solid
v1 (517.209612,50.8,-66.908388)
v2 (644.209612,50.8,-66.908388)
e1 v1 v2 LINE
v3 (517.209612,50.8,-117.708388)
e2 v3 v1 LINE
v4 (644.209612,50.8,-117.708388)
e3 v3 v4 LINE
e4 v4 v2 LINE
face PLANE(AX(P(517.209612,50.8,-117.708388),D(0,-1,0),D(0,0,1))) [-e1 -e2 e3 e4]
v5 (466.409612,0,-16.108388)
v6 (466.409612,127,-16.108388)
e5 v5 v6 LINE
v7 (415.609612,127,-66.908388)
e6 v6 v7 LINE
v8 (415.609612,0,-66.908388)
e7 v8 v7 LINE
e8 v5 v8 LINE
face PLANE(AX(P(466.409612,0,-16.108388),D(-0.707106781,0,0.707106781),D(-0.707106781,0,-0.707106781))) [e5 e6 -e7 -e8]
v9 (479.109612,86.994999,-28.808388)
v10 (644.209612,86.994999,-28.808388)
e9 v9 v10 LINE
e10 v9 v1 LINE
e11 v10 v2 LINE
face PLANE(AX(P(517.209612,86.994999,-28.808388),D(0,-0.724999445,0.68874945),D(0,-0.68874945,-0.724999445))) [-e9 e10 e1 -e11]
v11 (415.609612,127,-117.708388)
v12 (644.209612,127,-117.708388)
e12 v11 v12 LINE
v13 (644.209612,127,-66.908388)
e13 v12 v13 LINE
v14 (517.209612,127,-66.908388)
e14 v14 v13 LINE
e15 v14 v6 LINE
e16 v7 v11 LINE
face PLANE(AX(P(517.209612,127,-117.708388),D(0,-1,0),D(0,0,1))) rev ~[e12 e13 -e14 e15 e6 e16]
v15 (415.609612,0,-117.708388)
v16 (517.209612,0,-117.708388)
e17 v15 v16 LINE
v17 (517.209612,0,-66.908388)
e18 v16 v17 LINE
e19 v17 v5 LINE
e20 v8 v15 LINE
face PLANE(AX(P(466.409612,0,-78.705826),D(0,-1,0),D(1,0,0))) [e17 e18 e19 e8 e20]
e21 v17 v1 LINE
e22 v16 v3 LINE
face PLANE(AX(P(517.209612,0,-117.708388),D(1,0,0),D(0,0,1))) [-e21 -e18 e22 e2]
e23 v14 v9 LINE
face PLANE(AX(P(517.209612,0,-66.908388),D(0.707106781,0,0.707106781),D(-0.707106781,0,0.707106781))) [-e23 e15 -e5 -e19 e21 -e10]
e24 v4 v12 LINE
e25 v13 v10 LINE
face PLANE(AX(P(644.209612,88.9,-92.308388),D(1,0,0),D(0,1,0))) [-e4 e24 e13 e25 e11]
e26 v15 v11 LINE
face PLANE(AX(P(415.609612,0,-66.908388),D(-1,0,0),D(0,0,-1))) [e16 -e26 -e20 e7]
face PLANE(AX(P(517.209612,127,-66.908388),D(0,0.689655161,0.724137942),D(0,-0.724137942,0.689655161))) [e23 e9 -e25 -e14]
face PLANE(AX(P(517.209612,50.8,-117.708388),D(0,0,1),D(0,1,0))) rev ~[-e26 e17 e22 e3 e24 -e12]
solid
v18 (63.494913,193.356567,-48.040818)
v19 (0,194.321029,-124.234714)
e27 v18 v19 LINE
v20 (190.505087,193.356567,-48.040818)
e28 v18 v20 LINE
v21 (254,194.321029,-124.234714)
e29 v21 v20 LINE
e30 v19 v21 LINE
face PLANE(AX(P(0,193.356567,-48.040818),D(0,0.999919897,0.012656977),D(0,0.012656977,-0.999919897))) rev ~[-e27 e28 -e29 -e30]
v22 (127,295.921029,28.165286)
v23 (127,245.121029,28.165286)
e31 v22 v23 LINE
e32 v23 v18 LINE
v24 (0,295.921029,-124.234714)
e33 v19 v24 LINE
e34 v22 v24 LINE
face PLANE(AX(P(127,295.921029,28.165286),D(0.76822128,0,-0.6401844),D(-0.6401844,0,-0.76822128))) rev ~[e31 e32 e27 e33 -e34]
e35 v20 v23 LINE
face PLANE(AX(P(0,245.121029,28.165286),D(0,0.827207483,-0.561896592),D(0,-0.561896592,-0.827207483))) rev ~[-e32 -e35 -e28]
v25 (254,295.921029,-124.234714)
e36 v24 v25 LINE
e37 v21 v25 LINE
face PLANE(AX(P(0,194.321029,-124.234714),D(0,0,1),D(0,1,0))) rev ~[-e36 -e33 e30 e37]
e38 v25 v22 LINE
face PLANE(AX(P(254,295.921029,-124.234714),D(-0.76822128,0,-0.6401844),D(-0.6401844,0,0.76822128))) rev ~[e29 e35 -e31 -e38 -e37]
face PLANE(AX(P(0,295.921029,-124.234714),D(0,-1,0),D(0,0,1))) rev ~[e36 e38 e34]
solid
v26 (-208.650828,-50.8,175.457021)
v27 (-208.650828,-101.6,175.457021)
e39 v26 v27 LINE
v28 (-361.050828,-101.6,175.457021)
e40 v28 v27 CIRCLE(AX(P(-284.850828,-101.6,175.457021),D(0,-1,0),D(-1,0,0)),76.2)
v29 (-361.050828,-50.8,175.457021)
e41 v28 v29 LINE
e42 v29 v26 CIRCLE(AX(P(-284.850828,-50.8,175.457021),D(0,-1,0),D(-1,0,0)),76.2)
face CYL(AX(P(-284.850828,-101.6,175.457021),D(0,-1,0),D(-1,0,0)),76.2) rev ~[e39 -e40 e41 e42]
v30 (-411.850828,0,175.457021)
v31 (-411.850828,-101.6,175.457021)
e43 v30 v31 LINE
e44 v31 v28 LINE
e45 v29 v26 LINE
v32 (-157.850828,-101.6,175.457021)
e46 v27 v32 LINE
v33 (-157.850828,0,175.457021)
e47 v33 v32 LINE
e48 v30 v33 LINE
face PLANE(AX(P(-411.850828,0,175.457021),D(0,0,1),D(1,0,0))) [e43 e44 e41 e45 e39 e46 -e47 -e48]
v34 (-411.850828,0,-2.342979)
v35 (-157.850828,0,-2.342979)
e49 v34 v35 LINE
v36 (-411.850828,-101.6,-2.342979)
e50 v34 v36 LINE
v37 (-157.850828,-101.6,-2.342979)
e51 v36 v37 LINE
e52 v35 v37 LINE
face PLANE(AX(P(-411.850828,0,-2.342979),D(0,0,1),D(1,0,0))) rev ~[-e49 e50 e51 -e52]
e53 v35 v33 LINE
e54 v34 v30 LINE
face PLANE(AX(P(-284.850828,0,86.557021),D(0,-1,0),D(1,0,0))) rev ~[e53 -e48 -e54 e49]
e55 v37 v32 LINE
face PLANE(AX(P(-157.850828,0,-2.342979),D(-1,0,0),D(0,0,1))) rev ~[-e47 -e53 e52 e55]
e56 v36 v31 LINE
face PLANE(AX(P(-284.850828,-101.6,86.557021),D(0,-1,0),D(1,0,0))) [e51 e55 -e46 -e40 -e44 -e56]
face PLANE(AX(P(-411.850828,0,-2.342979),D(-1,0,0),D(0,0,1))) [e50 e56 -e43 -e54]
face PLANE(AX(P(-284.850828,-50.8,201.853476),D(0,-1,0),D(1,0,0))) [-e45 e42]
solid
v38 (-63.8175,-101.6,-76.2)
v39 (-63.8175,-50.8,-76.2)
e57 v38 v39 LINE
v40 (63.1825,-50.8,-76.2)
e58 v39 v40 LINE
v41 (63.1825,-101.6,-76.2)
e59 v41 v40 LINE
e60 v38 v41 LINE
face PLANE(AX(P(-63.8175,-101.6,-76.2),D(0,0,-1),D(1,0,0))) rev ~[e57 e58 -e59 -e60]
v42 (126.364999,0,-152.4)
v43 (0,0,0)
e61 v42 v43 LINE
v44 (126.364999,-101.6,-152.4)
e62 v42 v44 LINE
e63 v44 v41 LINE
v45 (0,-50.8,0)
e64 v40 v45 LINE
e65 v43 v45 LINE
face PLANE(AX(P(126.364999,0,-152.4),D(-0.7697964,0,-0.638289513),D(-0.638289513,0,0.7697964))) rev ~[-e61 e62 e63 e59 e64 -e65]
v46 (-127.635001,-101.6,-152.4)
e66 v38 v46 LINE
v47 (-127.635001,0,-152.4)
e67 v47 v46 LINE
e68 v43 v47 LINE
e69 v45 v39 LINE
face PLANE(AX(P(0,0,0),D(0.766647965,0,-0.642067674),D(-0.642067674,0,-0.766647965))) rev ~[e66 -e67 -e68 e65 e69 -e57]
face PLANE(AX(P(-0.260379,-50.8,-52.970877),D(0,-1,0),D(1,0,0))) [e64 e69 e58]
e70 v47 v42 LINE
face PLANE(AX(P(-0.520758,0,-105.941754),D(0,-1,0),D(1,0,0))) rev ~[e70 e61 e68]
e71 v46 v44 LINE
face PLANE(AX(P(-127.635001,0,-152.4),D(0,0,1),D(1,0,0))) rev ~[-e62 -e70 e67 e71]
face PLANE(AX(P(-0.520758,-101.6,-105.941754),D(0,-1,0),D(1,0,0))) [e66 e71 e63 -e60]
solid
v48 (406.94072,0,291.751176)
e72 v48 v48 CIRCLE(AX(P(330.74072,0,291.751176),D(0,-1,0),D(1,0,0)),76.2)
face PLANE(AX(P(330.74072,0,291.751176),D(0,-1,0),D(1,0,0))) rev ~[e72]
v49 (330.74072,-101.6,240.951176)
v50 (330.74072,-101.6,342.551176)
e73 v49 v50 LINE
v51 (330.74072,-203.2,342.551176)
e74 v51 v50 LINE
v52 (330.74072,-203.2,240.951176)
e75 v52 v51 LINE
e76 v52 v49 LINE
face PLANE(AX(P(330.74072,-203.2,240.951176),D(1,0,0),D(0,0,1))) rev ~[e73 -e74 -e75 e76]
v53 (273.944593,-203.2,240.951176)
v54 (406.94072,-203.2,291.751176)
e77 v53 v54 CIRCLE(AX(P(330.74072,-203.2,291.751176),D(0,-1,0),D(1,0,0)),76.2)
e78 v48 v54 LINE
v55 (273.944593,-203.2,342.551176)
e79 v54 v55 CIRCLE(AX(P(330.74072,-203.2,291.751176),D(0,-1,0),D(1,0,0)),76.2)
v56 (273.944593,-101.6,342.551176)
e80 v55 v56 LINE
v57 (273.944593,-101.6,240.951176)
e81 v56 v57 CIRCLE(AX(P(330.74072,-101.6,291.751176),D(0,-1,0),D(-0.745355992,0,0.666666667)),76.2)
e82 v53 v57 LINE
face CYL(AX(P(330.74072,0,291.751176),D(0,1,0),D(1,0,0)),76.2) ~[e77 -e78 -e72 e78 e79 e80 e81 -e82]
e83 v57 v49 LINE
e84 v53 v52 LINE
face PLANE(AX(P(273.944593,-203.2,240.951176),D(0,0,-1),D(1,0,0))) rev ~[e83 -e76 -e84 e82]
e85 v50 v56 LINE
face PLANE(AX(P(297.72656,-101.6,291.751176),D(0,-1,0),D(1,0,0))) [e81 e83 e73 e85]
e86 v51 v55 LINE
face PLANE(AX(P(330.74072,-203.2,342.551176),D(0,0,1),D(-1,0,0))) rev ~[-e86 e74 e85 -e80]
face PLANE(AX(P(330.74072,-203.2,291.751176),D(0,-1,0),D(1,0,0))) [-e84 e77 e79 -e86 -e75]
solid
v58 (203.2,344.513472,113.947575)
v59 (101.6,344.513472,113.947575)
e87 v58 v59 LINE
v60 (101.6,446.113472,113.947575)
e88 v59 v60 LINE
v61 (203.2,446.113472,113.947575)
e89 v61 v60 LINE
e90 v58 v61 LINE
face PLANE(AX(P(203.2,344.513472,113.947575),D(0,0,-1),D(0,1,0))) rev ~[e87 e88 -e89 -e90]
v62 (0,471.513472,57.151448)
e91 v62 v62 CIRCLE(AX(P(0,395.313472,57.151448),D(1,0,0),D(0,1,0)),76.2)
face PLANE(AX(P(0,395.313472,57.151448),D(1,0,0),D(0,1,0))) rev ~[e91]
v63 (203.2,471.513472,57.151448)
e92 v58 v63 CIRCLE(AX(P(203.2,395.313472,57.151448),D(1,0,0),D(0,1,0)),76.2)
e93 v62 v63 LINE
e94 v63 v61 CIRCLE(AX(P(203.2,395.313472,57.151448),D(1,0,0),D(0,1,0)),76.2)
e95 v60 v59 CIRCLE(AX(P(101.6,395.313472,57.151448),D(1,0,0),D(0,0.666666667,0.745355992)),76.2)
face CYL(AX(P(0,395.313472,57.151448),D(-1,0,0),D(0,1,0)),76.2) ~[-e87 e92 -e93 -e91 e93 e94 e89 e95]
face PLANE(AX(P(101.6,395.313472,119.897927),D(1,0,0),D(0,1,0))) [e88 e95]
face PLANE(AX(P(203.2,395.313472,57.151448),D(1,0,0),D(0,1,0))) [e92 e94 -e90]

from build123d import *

# Parameters (mm, degrees)
F1_DEPTH  = 101.6
F3_DEPTH  = 50.8
F5_DEPTH  = 254
F7_DEPTH  = 254
F9_DEPTH  = 254
F11_DEPTH = 127
F12_W     = 76.2
F12_H     = 50.8
F13_DEPTH = 127
F15_R     = 76.2
F16_DEPTH = 203.2
F18_DEPTH = 101.6
F19_R     = 76.2
F20_DEPTH = 203.2
F22_DEPTH = 101.6
F23_W     = 254
F23_H     = 177.8
F24_DEPTH = 101.6
F26_DEPTH = 50.8


with BuildPart() as f1:
    # F0 (on Front) → F1 (new body)
    with BuildSketch(Plane.XZ):
        Polygon((0, 0), (-127.6350005588, -152.4), (126.3649994412, -152.4), align=None)
    extrude(amount=F1_DEPTH)

    # F2 (on face) → F3 (cut)
    with BuildSketch(Plane.XZ.offset(101.6)):
        Polygon((0, 0), (-63.8175002794, -76.2), (63.1824997206, -76.2), align=None)
    extrude(amount=-F3_DEPTH, mode=Mode.SUBTRACT)


with BuildPart() as f5:
    # F4 (on Right) → F5 (new body)
    with BuildSketch(Plane.YZ):
        Polygon((193.3565672969, -48.0408182748), (194.32102892, -124.2347144462), (295.92102892, -124.2347144462), (295.92102892, 28.1652855538), (245.12102892, 28.1652855538), align=None)
    extrude(amount=F5_DEPTH)

    # F6 (on face) → F7 (cut)
    with BuildSketch(Plane(origin=(0, 295.92102892, 0), x_dir=(-1, 0, 0), z_dir=(0, 1, 0))):
        Polygon((-254, 28.1652855538), (-254, -124.2347144462), (-127, 28.1652855538), align=None)
    extrude(amount=-F7_DEPTH, mode=Mode.SUBTRACT)

    # F8 (on face) → F9 (cut)
    with BuildSketch(Plane(origin=(0, 295.92102892, 0), x_dir=(-1, 0, 0), z_dir=(0, 1, 0))):
        Polygon((-127, 28.1652855538), (0, -124.2347144462), (0, 28.1652855538), align=None)
    extrude(amount=-F9_DEPTH, mode=Mode.SUBTRACT)


with BuildPart() as f11:
    # F10 (on Front) → F11 (new body)
    with BuildSketch(Plane.XZ):
        Polygon((415.6096123431, -66.908387676), (415.6096123431, -117.708387676), (517.2096123431, -117.708387676), (517.2096123431, -66.908387676), (466.4096123431, -16.108387676), align=None)
    extrude(amount=-F11_DEPTH)

    # F12 (on face) → F13 (join)
    with BuildSketch(Plane.YZ.offset(517.2096123431)):
        with Locations((88.9, -92.308387676)):
            Rectangle(F12_W, F12_H)
        Polygon((50.8, -66.908387676), (127, -66.908387676), (86.994998771, -28.808387676), align=None)
    extrude(amount=F13_DEPTH)

    # F12 (on face) → F14 (join, up to the next surface of F11)
    with BuildSketch(Plane.YZ.offset(517.2096123431)):
        Polygon((50.8, -66.908387676), (127, -66.908387676), (86.994998771, -28.808387676), align=None)
    extrude(until=Until.NEXT, dir=(-1, 0, 0))


with BuildPart() as f16:
    # F15 (on Right) → F16 (new body)
    with BuildSketch(Plane.YZ):
        with Locations((395.3134715557, 57.1514479816)):
            Circle(F15_R)
    extrude(amount=F16_DEPTH)

    # F17 (on face) → F18 (cut)
    with BuildSketch(Plane.YZ.offset(203.2)):
        with BuildLine():
            ThreePointArc((446.1134715557, 113.9475746101), (395.3134715557, 133.3514479816), (344.5134715557, 113.9475746101))
            Line((344.5134715557, 113.9475746101), (446.1134715557, 113.9475746101))
        make_face()
    extrude(amount=-F18_DEPTH, mode=Mode.SUBTRACT)


with BuildPart() as f20:
    # F19 (on Front) → F20 (new body)
    with BuildSketch(Plane.XZ):
        with Locations((330.7407200336, 291.7511761189)):
            Circle(F19_R)
    extrude(amount=F20_DEPTH)

    # F21 (on face) → F22 (cut)
    with BuildSketch(Plane.XZ.offset(203.2)):
        with BuildLine():
            Line((330.7407200336, 342.5511761189), (273.9445934052, 342.5511761189))
            ThreePointArc((273.9445934052, 342.5511761189), (254.5407200336, 291.7511761189), (273.9445934052, 240.9511761189))
            Line((273.9445934052, 240.9511761189), (330.7407200336, 240.9511761189))
            Line((330.7407200336, 240.9511761189), (330.7407200336, 342.5511761189))
        make_face()
    extrude(amount=-F22_DEPTH, mode=Mode.SUBTRACT)


with BuildPart() as f24:
    # F23 (on Front) → F24 (new body)
    with BuildSketch(Plane.XZ):
        with Locations((-284.8508283496, 86.5570213336)):
            Rectangle(F23_W, F23_H)
    extrude(amount=F24_DEPTH)

    # F25 (on face) → F26 (cut)
    with BuildSketch(Plane.XZ.offset(101.6)):
        with BuildLine():
            Line((-361.0508283496, 175.4570213336), (-208.6508283496, 175.4570213336))
            ThreePointArc((-208.6508283496, 175.4570213336), (-284.8508283496, 251.6570213336), (-361.0508283496, 175.4570213336))
        make_face()
        with BuildLine():
            ThreePointArc((-361.0508283496, 175.4570213336), (-284.8508283496, 99.2570213336), (-208.6508283496, 175.4570213336))
            Line((-208.6508283496, 175.4570213336), (-361.0508283496, 175.4570213336))
        make_face()
    extrude(amount=-F26_DEPTH, mode=Mode.SUBTRACT)


solid = Compound([f1.part, f5.part, f11.part, f16.part, f20.part, f24.part])
